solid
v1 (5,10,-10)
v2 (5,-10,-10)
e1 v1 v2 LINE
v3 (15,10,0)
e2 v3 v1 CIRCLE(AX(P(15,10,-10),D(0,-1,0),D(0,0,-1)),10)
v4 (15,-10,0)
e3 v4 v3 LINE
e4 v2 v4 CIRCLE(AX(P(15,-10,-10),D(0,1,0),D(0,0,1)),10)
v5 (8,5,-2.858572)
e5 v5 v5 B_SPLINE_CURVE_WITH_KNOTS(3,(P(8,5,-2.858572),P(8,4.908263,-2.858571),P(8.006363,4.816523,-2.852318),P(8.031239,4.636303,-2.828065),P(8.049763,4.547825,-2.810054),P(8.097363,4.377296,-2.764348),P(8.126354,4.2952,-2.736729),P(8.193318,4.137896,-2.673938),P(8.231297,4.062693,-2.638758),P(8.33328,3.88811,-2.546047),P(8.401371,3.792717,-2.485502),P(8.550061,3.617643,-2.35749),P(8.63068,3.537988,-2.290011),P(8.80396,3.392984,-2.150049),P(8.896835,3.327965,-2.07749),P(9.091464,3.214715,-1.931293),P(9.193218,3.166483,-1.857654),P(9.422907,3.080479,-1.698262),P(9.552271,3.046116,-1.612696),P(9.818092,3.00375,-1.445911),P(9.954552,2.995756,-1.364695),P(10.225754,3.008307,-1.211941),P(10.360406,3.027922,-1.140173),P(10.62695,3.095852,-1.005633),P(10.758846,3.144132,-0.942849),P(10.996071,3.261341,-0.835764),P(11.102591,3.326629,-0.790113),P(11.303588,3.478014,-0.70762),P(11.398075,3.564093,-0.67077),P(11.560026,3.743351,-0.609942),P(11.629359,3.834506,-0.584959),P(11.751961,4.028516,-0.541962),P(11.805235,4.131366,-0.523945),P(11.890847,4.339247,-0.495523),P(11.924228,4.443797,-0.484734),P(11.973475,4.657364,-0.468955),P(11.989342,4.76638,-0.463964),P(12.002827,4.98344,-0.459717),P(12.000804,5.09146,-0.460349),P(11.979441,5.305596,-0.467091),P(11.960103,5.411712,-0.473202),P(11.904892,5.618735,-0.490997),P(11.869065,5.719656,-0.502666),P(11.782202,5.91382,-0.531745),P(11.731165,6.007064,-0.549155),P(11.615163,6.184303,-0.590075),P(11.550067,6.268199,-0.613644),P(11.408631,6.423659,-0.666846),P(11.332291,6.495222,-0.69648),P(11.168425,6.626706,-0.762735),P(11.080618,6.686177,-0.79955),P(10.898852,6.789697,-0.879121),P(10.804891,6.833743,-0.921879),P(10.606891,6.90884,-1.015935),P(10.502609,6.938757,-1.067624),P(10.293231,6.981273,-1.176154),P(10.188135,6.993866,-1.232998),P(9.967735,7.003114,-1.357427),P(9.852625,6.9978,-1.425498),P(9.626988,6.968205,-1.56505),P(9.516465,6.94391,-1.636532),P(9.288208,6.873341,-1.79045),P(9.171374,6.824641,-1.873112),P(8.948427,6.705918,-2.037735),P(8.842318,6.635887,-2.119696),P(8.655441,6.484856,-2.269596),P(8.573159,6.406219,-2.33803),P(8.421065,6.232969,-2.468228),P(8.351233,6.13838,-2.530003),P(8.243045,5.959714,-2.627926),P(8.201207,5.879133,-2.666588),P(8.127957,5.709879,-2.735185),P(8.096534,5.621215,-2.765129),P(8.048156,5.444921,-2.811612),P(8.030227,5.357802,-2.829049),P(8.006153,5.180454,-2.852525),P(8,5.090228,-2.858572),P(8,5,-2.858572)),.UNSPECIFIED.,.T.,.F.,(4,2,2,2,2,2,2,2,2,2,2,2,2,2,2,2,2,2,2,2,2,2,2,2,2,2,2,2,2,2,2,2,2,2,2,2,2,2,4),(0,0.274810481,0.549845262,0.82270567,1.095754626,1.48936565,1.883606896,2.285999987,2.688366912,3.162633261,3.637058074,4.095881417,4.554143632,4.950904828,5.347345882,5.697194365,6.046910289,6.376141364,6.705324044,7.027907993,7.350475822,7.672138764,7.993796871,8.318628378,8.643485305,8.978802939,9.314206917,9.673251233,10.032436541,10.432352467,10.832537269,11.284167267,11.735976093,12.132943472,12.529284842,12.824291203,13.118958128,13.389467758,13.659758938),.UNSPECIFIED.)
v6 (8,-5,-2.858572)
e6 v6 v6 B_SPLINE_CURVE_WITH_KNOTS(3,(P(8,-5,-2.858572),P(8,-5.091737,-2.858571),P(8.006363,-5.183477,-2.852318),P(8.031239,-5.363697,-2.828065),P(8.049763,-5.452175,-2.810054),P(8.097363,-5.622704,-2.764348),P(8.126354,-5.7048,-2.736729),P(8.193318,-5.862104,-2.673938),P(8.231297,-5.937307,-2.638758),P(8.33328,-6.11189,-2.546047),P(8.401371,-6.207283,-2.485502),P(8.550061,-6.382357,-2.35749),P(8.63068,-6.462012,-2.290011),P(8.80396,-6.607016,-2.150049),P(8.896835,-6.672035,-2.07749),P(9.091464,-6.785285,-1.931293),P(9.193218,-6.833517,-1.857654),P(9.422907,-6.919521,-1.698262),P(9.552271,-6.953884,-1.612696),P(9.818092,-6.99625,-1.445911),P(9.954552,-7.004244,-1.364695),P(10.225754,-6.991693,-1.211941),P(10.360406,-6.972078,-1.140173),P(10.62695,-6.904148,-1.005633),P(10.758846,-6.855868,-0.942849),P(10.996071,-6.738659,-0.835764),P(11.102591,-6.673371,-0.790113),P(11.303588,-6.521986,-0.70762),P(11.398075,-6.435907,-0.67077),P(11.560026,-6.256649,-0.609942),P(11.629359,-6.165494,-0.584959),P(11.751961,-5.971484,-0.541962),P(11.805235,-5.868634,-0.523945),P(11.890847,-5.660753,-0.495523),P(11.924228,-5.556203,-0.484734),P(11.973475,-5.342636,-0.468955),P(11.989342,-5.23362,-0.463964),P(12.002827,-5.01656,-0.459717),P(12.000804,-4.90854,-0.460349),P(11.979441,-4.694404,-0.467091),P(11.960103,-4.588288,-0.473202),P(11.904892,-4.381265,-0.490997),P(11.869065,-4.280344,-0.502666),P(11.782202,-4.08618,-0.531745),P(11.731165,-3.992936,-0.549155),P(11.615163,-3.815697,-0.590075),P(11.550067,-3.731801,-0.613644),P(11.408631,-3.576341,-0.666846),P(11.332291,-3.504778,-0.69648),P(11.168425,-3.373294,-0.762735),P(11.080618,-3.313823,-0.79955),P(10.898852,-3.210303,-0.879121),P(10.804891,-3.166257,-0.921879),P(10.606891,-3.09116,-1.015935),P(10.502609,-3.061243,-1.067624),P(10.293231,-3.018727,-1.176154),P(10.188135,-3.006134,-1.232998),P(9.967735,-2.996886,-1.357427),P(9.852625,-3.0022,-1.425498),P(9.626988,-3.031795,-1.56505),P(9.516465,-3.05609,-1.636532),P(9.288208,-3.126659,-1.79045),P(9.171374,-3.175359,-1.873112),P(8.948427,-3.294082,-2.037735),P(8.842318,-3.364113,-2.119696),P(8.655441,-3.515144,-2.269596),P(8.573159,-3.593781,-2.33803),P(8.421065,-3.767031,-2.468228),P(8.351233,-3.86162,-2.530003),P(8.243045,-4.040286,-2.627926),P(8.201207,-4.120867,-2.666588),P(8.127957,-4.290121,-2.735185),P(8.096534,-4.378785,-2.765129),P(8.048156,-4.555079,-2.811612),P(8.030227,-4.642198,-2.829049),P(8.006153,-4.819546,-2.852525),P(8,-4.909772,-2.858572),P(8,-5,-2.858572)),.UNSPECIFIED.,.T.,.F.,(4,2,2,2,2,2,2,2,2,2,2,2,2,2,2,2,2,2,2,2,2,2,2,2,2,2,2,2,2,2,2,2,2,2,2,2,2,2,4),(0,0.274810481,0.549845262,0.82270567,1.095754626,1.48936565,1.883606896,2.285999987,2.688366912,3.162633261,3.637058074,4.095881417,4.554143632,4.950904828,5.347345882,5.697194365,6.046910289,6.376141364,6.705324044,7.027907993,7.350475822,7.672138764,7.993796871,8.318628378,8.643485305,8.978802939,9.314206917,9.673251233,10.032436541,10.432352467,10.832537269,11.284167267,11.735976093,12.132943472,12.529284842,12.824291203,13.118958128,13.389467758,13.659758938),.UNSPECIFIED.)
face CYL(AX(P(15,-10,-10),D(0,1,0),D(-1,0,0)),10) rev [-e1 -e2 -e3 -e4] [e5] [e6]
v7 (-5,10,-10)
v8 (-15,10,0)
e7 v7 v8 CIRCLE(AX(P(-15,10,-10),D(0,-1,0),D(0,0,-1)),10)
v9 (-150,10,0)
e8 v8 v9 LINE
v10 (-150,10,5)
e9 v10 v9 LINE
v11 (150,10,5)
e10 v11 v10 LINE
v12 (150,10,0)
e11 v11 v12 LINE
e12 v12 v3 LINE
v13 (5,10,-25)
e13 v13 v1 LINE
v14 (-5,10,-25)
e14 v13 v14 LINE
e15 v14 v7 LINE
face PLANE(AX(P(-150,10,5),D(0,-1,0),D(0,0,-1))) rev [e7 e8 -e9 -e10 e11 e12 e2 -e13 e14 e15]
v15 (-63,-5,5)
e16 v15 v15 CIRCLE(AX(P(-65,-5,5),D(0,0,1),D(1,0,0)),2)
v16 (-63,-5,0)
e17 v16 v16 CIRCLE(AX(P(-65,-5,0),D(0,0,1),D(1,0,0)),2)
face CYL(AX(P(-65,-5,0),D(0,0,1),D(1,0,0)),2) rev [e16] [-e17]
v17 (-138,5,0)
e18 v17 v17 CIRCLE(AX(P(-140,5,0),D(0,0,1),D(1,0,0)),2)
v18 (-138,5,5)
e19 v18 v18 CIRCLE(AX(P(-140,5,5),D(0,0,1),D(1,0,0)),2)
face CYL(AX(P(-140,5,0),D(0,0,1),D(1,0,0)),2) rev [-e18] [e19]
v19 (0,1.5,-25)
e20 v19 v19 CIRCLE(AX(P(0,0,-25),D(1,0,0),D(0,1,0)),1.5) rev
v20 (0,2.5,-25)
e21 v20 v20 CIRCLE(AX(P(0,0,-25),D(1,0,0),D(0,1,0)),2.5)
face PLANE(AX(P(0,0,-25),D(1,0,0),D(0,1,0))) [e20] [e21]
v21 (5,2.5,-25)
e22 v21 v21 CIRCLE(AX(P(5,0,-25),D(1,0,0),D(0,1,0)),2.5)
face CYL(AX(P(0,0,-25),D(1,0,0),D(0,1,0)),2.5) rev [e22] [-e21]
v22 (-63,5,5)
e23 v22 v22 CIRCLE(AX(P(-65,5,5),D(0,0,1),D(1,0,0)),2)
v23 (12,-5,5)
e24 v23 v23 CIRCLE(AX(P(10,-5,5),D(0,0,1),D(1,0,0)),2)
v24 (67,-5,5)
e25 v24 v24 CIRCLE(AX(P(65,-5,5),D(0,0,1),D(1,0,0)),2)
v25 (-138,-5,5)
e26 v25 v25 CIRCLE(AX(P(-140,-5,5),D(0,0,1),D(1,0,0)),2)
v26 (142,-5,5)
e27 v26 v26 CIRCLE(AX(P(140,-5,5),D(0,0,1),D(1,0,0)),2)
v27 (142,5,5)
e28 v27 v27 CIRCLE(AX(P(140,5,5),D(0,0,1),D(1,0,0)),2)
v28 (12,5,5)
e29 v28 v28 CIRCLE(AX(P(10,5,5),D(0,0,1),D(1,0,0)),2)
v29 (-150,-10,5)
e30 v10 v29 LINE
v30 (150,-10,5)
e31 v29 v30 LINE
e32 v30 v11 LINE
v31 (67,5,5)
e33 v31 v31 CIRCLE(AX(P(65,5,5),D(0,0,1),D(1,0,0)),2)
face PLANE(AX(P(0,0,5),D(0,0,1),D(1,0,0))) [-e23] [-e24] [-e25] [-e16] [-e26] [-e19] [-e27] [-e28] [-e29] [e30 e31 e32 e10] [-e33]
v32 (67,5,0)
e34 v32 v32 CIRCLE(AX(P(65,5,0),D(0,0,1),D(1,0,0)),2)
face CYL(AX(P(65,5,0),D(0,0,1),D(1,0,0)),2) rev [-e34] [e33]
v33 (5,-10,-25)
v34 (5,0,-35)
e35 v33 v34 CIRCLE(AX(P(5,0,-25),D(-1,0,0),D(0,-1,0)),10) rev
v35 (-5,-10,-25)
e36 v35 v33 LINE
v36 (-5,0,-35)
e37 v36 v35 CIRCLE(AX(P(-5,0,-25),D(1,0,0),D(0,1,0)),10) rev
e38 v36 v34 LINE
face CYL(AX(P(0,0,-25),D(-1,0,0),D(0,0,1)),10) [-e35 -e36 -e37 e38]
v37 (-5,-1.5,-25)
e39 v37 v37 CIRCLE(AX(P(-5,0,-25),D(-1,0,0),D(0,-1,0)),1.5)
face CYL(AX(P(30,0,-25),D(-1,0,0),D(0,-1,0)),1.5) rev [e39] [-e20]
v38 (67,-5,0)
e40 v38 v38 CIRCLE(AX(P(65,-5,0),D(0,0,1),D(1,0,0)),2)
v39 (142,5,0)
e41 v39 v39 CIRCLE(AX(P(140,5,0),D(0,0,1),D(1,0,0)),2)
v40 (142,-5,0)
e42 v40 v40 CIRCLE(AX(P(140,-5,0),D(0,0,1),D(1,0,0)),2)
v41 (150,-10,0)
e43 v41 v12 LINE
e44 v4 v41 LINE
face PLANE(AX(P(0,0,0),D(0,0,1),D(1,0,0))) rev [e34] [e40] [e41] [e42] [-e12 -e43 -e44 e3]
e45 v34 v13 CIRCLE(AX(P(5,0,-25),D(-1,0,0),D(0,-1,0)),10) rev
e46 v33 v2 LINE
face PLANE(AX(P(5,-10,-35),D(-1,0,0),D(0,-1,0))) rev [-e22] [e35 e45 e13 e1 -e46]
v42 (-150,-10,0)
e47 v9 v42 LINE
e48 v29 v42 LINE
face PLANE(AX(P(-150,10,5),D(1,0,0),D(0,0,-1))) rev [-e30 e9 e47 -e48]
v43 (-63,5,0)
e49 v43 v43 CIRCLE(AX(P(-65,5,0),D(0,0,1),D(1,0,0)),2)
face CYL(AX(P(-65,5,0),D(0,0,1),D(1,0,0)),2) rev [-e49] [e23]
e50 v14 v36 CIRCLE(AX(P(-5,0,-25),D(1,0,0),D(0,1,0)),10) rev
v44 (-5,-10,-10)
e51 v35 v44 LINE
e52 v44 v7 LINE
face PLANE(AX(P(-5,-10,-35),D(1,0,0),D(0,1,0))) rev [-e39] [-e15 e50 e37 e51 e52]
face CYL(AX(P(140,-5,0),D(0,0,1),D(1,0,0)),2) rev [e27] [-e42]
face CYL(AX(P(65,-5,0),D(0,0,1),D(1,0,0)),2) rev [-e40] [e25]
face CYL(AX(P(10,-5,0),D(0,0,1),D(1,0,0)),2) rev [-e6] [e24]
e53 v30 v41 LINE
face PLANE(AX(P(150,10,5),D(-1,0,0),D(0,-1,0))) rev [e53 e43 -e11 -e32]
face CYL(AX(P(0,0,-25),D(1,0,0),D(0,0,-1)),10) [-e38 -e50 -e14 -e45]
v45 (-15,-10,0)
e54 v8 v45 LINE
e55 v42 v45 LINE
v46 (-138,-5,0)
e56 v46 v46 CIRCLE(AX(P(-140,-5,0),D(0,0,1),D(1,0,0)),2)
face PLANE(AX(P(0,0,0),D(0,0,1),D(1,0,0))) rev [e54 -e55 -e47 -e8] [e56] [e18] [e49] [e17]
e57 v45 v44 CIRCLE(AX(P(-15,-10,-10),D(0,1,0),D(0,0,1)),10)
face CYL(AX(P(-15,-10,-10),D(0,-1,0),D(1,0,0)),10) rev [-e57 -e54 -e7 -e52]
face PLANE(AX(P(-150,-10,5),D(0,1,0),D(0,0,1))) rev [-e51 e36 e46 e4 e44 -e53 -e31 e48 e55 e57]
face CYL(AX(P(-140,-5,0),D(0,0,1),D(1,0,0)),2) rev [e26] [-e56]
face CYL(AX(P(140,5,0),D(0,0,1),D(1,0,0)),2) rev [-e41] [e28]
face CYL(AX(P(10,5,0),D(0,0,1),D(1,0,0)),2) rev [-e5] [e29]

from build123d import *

# Parameters (mm, degrees)
ESQUISSE1_W             = 300
ESQUISSE1_H             = 20
BOSS_EXTRU_1_DEPTH      = 5
ESQUISSE2_R             = 2
ENL_V_MAT_EXTRU_1_DEPTH = 5
ESQUISSE3_W             = 10
ESQUISSE3_H             = 20
BOSS_EXTRU_2_DEPTH      = 35
CONG_1_R                = 10
CONG_2_R                = 10
ESQUISSE4_R             = 1.5
ENL_V_MAT_EXTRU_2_DEPTH = 35
ESQUISSE6_R             = 2.5
ENL_V_MAT_EXTRU_3_DEPTH = 5


# Some blends are built 0.0001 mm under size
with BuildPart() as part:
    # Esquisse1 → Boss.-Extru.1 (new body)
    with BuildSketch(Plane.XY):
        Rectangle(ESQUISSE1_W, ESQUISSE1_H)
    extrude(amount=BOSS_EXTRU_1_DEPTH)

    # Esquisse2 → Enlèv. mat.-Extru.1 (cut)
    with BuildSketch(Plane.XY.offset(5)):
        with Locations((-140, 5)):
            Circle(ESQUISSE2_R)
        with Locations((-140, -5)):
            Circle(ESQUISSE2_R)
        with Locations((-65, 5)):
            Circle(ESQUISSE2_R)
        with Locations((-65, -5)):
            Circle(ESQUISSE2_R)
        with Locations((10, 5)):
            Circle(ESQUISSE2_R)
        with Locations((10, -5)):
            Circle(ESQUISSE2_R)
        with Locations((65, 5)):
            Circle(ESQUISSE2_R)
        with Locations((65, -5)):
            Circle(ESQUISSE2_R)
        with Locations((140, 5)):
            Circle(ESQUISSE2_R)
        with Locations((140, -5)):
            Circle(ESQUISSE2_R)
    extrude(amount=-ENL_V_MAT_EXTRU_1_DEPTH, mode=Mode.SUBTRACT)

    # Esquisse3 → Boss.-Extru.2 (add)
    with BuildSketch(Plane(origin=(0, 0, 0), x_dir=(-1, 0, 0), z_dir=(0, 0, -1))):
        Rectangle(ESQUISSE3_W, ESQUISSE3_H)
    extrude(amount=BOSS_EXTRU_2_DEPTH)

    # Congé1
    # the kernel refuses this fillet: 10 mm, written as the material it adds along each edge
    with BuildSketch(Plane(origin=(5, 10, 0), x_dir=(1, 0, 0), z_dir=(0, -1, 0))) as cong_1_piece_1_section:
        with BuildLine():
            CenterArc((CONG_1_R, -CONG_1_R), CONG_1_R, 90, 90)
            Line((0, -CONG_1_R), (0, 0))
            Line((0, 0), (CONG_1_R, 0))
        make_face()
    cong_1_piece_1 = extrude(amount=20, mode=Mode.PRIVATE)
    cong_1_piece_1 = cong_1_piece_1 - Plane(origin=(10, -5, -2.39791943), x_dir=(1, 0, 0), z_dir=(0, 0, 1)) * Cylinder(2, 80, mode=Mode.PRIVATE)
    cong_1_piece_1 = cong_1_piece_1 - Plane(origin=(10, 5, -2.39791943), x_dir=(1, 0, 0), z_dir=(0, 0, 1)) * Cylinder(2, 80, mode=Mode.PRIVATE)
    add(cong_1_piece_1)
    with BuildSketch(Plane(origin=(-5, -10, 0), x_dir=(-1, 0, 0), z_dir=(0, 1, 0))) as cong_1_piece_2:
        with BuildLine():
            CenterArc((CONG_1_R, -CONG_1_R), CONG_1_R, 90, 90)
            Line((0, -CONG_1_R), (0, 0))
            Line((0, 0), (CONG_1_R, 0))
        make_face()
    extrude(amount=20)

    # Congé2
    cong_2_edges = [part.edges().sort_by_distance(p)[0] for p in [
        (0, -10, -35),
        (0, 10, -35),
    ]]
    fillet(cong_2_edges, radius=CONG_2_R - 0.0001)  # a hair under: the kernel refuses the full size

    # Esquisse4 → Enlèv. mat.-Extru.2 (cut)
    with BuildSketch(Plane.ZY.offset(5)):
        with Locations(Location((-25, 0, 0), (0, 0, 270))):
            Circle(ESQUISSE4_R)
    extrude(amount=-ENL_V_MAT_EXTRU_2_DEPTH, mode=Mode.SUBTRACT)

    # Esquisse6 → Enlèv. mat.-Extru.3 (cut)
    with BuildSketch(Plane(origin=(5, 0, 0), x_dir=(0, 0, -1), z_dir=(1, 0, 0))):
        with Locations(Location((25, 0, 0), (0, 0, 90))):
            Circle(ESQUISSE6_R)
    extrude(amount=-ENL_V_MAT_EXTRU_3_DEPTH, mode=Mode.SUBTRACT)


solid = part.part
